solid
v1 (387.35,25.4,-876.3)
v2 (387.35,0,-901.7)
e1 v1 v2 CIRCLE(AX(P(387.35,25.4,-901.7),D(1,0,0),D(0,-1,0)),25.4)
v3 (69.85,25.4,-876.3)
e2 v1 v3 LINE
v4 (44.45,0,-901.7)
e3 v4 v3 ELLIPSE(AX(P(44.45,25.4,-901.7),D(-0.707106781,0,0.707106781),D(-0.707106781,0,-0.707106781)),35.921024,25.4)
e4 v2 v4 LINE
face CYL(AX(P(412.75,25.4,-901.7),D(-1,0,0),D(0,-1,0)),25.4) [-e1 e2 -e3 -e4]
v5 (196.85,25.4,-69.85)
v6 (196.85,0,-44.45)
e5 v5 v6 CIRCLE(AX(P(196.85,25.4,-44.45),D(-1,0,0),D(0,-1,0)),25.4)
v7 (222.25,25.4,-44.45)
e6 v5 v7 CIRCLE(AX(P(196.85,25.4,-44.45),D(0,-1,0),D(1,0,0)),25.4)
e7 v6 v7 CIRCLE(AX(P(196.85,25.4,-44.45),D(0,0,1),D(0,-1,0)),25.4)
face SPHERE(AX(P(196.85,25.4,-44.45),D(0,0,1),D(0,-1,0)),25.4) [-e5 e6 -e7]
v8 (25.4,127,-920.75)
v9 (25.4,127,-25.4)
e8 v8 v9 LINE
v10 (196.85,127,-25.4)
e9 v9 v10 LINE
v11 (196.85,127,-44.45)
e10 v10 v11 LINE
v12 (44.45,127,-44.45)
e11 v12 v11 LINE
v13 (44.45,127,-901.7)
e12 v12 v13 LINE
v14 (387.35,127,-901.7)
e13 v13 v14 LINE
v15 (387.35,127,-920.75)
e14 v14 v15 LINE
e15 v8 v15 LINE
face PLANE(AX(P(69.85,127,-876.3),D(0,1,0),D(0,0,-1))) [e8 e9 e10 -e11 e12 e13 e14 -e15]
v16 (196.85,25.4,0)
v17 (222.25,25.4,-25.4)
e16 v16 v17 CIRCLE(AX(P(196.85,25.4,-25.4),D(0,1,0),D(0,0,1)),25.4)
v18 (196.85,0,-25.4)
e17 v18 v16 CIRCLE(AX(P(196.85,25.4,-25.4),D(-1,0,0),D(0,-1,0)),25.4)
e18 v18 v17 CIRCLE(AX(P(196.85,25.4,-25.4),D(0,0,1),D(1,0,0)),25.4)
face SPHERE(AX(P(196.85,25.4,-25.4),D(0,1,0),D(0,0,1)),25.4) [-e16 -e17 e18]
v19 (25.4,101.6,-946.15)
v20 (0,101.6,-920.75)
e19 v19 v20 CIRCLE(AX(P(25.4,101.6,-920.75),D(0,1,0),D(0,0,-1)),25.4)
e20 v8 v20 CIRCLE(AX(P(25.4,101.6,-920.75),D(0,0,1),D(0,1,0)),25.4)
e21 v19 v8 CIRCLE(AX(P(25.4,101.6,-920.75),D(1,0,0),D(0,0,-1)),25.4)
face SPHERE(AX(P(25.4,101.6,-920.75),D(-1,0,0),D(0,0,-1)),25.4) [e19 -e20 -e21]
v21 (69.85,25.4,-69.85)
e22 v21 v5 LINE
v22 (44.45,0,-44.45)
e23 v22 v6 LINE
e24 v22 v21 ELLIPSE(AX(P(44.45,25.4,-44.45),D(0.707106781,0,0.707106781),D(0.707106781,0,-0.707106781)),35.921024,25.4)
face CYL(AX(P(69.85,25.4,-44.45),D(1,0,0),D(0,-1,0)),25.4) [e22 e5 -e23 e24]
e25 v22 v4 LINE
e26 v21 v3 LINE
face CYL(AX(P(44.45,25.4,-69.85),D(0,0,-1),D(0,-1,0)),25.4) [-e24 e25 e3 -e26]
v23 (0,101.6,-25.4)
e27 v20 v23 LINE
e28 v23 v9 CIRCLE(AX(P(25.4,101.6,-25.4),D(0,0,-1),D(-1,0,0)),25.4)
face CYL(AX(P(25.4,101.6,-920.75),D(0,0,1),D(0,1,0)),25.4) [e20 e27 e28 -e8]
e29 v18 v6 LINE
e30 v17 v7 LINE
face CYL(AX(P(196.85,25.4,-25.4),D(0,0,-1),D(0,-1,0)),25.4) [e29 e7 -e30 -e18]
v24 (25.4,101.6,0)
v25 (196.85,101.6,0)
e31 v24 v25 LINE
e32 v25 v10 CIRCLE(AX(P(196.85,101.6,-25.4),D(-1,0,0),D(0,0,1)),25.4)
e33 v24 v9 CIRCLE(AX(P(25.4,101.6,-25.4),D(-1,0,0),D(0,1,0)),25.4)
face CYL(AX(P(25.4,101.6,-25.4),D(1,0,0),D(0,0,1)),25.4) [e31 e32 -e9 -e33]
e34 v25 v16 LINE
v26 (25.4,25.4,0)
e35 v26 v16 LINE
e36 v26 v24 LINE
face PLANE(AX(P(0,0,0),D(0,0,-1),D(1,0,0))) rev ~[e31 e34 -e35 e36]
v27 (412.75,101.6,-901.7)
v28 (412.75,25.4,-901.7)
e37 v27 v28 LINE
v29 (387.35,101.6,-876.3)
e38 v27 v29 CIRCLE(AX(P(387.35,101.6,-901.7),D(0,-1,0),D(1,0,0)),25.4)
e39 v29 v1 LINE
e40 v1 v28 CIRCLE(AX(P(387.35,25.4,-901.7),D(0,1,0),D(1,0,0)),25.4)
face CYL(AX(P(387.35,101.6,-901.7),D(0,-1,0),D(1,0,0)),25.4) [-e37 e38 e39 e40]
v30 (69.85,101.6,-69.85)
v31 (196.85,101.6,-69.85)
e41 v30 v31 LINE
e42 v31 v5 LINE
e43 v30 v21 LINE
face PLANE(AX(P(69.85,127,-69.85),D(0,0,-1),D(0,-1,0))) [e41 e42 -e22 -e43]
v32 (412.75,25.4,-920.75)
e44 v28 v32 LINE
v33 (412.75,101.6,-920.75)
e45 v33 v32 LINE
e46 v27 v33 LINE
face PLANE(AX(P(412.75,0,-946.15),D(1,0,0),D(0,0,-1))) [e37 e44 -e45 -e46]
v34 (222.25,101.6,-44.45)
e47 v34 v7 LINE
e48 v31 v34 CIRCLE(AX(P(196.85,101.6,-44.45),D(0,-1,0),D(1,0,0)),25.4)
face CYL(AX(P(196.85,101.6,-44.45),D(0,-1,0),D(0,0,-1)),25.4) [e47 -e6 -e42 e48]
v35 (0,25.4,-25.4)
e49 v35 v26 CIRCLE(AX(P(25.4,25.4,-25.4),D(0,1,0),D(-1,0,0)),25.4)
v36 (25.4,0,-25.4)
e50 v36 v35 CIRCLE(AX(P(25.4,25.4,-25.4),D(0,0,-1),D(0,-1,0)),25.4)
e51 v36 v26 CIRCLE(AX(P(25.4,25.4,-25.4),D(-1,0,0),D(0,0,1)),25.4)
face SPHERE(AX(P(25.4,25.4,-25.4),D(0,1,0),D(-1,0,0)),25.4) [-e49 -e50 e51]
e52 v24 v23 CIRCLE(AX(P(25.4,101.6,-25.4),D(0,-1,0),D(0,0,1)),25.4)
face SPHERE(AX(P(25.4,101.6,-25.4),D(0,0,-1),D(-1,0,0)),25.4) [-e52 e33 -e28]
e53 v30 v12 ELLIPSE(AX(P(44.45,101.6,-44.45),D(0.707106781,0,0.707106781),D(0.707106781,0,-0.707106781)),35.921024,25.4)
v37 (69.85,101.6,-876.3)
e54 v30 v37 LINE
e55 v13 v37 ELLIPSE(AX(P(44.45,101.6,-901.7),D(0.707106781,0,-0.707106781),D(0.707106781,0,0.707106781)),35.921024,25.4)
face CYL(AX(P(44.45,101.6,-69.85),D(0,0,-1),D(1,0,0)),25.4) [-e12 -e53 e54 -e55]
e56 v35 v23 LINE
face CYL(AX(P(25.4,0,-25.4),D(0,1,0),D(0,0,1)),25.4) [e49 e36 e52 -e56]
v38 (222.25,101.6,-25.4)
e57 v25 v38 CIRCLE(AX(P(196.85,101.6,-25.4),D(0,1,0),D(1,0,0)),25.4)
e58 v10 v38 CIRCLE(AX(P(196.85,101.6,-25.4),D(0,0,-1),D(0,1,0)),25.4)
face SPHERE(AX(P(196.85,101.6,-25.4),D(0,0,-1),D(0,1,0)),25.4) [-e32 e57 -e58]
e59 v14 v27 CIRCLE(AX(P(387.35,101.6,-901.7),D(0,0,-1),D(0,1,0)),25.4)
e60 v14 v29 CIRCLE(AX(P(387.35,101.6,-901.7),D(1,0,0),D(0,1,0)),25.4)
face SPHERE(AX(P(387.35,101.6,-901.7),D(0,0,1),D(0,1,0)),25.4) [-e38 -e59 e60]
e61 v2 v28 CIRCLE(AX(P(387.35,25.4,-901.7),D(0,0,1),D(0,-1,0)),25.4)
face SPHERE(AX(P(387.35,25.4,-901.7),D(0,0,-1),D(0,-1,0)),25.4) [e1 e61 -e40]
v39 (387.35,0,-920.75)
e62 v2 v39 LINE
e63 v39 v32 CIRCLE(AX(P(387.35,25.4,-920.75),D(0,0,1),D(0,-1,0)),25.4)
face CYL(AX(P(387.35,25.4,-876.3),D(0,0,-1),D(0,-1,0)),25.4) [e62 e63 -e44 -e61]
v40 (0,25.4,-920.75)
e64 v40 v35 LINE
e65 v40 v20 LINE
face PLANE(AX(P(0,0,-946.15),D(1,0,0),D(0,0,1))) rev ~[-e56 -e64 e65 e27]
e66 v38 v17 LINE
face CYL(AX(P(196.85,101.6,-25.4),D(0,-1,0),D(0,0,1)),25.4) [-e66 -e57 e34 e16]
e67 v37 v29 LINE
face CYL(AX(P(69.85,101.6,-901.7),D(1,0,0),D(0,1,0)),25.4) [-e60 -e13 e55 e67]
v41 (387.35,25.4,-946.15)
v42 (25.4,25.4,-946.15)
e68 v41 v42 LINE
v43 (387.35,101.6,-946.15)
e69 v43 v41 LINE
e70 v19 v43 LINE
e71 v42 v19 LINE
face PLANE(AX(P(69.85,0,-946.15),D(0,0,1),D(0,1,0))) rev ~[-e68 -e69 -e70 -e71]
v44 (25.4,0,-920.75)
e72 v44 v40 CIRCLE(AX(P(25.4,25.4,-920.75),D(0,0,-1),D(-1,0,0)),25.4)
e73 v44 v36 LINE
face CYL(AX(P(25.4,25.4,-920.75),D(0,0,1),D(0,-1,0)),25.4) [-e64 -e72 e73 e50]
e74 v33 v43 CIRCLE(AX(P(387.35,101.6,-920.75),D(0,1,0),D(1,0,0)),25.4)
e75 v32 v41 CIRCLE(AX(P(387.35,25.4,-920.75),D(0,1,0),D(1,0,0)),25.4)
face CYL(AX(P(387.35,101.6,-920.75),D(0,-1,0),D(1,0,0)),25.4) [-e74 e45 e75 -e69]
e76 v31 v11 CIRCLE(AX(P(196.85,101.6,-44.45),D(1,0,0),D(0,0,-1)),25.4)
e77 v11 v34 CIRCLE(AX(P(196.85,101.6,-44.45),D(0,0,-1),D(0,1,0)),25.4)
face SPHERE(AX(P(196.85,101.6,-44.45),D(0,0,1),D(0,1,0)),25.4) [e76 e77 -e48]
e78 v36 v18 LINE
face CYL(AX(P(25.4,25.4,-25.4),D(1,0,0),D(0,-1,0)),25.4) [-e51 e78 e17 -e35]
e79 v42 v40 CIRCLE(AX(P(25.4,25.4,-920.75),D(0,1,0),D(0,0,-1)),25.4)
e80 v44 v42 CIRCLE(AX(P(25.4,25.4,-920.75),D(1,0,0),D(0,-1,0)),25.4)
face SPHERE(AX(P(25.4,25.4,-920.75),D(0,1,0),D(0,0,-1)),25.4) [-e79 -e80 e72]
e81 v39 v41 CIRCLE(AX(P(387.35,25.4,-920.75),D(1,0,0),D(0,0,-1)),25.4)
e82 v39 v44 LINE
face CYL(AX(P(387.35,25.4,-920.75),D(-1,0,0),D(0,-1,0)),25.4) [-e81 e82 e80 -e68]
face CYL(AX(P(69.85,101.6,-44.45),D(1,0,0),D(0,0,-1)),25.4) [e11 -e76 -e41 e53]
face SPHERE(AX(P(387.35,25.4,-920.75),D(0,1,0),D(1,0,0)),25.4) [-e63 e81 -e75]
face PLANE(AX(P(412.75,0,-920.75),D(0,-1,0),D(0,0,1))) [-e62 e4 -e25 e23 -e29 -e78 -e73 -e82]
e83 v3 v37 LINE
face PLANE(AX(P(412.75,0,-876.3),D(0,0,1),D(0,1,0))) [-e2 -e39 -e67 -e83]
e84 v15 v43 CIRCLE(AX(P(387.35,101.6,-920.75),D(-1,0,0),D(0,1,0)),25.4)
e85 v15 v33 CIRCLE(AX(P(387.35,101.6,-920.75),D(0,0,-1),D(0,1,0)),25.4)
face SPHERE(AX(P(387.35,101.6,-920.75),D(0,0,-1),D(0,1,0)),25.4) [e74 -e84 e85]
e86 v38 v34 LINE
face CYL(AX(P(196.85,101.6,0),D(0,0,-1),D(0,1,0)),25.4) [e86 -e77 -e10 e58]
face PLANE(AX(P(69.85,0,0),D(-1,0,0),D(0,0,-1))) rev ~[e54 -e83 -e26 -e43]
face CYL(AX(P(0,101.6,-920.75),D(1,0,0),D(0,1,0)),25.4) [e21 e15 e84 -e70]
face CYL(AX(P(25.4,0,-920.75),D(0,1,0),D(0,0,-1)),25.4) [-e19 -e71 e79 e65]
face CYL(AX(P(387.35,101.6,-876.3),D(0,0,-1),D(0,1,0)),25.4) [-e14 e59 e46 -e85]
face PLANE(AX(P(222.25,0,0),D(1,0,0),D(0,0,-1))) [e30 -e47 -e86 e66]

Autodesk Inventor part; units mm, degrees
ref_plane "YZ Plane" through (0, 0, 0) normal (1, 0, 0) x (0, 1, 0)
ref_plane "XZ Plane" through (0, 0, 0) normal (0, 1, 0) x (-1, 0, 0)
ref_plane "XY Plane" through (0, 0, 0) normal (0, 0, 1) x (1, 0, 0)
sketch "Sketch1" plane through (0, 0, 0) normal (0, 1, 0) x (-1, 0, 0)
  line L0 (0, 0) -> (-69.85, 0)
  line L1 (-69.85, 0) -> (-69.85, -946.15)
  line L2 (-69.85, -946.15) -> (0, -946.15)
  line L3 (0, -946.15) -> (0, 0)
  dimension "d0" = 946.15
  dimension "d1" = 69.85
extrude "Extrusion1" add sketch "Sketch1" along normal blind 127
sketch "Sketch2" plane through (69.85, 0, 0) normal (1, 0, 0) x (0, 0, -1)
  line L0 (0, 127) -> (69.85, 127)
  line L1 (69.85, 127) -> (69.85, 0)
  line L2 (69.85, 0) -> (0, 0)
  line L3 (0, 0) -> (0, 127)
  point P0 (946.15, 127)
  dimension "d4" = 69.85
extrude "Extrusion2" add sketch "Sketch2" along normal blind 152.4
sketch "Sketch3" plane through (69.85, 0, -946.15) normal (1, 0, 0) x (0, 0, -1)
  line L0 (0, 0) -> (0, 127) projected
  line L1 (-876.3, 127) -> (0, 127) projected
  line L2 (0, 0) -> (-69.85, 0)
  line L3 (-69.85, 0) -> (-69.85, 127)
  line L4 (-69.85, 127) -> (0, 127)
  line L5 (0, 127) -> (0, 0)
  point P0 (-946.15, 0)
  dimension "d8" = 69.85
extrude "Extrusion3" add sketch "Sketch3" along normal blind 342.9
fillet "Fillet1" radius 25.4 1 edges at (222.25, 127, -34.925)
fillet "Fillet2" radius 25.4 1 edges at (412.75, 127, -911.225)
fillet "Fillet6" radius 25.4 3 edges at (193.675, 127, -946.15) (405.3105, 119.5605, -946.15) (412.75, 50.8, -946.15)
fillet "Fillet7" radius 25.4 3 edges at (0, 127, -460.375) (0, 119.5605, -938.7105) (0, 50.8, -946.15)
fillet "Fillet8" radius 25.4 5 edges at (214.8105, 119.5605, 0) (222.25, 50.8, 0) (7.4395, 119.5605, 0) (0, 50.8, 0) (111.125, 127, 0)
sketch "Sketch4" plane through (412.75, 0, -946.15) normal (1, 0, 0) x (0, 0, -1)
  line L0 (-25.4, 101.6) -> (-25.4, 0) projected
  line L1 (-69.85, 101.6) -> (-25.4, 101.6) projected
  line L2 (-25.4, 0) -> (-69.85, 0)
  line L3 (-69.85, 0) -> (-69.85, 101.6)
  line L4 (-69.85, 101.6) -> (-25.4, 101.6)
  line L5 (-25.4, 101.6) -> (-25.4, 0)
  point P0 (-946.15, 0)
extrude "Extrusion4" add sketch "Sketch4" along normal blind 12.7
sketch "Sketch5" plane through (425.45, 0, -946.15) normal (1, 0, 0) x (0, 0, -1)
  line L0 (-69.85, 101.6) -> (-69.85, 0) projected
  line L1 (-69.85, 101.6) -> (-25.4, 101.6)
  line L2 (-25.4, 101.6) -> (-25.4, 0)
  line L3 (-25.4, 0) -> (-69.85, 0)
  line L4 (-69.85, 0) -> (-69.85, 101.6)
  point P0 (-946.15, 0)
extrude "Extrusion5" cut sketch "Sketch5" against normal blind 12.7
fillet "Fillet9" radius 25.4 19 edges at (214.8105, 0, -7.4395) (222.25, 0, -47.625) (7.4395, 0, -7.4395) (0, 0, -473.075) (7.4395, 0, -938.7105) (206.375, 0, -946.15) (405.3105, 0, -938.7105) (412.75, 0, -898.525) (111.125, 0, 0) (146.05, 0, -69.85) (69.85, 0, -473.075) (241.3, 0, -876.3) (405.3105, 119.5605, -876.3) (228.6, 127, -876.3) (412.75, 50.8, -876.3) (214.8105, 119.5605, -69.85) (133.35, 127, -69.85) (222.25, 50.8, -69.85) (69.85, 127, -473.075)
equation "\"BendRadius\" = Thickness"
equation "\"BendReliefWidth\" = Thickness"
equation "\"BendReliefDepth\" = 0.5 * Thickness"
equation "\"CornerReliefSize\" = 4 * Thickness"
equation "\"MinimumRemnant\" = 2 * Thickness"
equation "\"TransitionRadius\" = BendRadius"
equation "\"JacobiRadiusSize\" = BendRadius"
equation "\"GapSize\" = Thickness"
equation "\"Thickness\" = 3.048"
properties part number "Bumpers_2020"
